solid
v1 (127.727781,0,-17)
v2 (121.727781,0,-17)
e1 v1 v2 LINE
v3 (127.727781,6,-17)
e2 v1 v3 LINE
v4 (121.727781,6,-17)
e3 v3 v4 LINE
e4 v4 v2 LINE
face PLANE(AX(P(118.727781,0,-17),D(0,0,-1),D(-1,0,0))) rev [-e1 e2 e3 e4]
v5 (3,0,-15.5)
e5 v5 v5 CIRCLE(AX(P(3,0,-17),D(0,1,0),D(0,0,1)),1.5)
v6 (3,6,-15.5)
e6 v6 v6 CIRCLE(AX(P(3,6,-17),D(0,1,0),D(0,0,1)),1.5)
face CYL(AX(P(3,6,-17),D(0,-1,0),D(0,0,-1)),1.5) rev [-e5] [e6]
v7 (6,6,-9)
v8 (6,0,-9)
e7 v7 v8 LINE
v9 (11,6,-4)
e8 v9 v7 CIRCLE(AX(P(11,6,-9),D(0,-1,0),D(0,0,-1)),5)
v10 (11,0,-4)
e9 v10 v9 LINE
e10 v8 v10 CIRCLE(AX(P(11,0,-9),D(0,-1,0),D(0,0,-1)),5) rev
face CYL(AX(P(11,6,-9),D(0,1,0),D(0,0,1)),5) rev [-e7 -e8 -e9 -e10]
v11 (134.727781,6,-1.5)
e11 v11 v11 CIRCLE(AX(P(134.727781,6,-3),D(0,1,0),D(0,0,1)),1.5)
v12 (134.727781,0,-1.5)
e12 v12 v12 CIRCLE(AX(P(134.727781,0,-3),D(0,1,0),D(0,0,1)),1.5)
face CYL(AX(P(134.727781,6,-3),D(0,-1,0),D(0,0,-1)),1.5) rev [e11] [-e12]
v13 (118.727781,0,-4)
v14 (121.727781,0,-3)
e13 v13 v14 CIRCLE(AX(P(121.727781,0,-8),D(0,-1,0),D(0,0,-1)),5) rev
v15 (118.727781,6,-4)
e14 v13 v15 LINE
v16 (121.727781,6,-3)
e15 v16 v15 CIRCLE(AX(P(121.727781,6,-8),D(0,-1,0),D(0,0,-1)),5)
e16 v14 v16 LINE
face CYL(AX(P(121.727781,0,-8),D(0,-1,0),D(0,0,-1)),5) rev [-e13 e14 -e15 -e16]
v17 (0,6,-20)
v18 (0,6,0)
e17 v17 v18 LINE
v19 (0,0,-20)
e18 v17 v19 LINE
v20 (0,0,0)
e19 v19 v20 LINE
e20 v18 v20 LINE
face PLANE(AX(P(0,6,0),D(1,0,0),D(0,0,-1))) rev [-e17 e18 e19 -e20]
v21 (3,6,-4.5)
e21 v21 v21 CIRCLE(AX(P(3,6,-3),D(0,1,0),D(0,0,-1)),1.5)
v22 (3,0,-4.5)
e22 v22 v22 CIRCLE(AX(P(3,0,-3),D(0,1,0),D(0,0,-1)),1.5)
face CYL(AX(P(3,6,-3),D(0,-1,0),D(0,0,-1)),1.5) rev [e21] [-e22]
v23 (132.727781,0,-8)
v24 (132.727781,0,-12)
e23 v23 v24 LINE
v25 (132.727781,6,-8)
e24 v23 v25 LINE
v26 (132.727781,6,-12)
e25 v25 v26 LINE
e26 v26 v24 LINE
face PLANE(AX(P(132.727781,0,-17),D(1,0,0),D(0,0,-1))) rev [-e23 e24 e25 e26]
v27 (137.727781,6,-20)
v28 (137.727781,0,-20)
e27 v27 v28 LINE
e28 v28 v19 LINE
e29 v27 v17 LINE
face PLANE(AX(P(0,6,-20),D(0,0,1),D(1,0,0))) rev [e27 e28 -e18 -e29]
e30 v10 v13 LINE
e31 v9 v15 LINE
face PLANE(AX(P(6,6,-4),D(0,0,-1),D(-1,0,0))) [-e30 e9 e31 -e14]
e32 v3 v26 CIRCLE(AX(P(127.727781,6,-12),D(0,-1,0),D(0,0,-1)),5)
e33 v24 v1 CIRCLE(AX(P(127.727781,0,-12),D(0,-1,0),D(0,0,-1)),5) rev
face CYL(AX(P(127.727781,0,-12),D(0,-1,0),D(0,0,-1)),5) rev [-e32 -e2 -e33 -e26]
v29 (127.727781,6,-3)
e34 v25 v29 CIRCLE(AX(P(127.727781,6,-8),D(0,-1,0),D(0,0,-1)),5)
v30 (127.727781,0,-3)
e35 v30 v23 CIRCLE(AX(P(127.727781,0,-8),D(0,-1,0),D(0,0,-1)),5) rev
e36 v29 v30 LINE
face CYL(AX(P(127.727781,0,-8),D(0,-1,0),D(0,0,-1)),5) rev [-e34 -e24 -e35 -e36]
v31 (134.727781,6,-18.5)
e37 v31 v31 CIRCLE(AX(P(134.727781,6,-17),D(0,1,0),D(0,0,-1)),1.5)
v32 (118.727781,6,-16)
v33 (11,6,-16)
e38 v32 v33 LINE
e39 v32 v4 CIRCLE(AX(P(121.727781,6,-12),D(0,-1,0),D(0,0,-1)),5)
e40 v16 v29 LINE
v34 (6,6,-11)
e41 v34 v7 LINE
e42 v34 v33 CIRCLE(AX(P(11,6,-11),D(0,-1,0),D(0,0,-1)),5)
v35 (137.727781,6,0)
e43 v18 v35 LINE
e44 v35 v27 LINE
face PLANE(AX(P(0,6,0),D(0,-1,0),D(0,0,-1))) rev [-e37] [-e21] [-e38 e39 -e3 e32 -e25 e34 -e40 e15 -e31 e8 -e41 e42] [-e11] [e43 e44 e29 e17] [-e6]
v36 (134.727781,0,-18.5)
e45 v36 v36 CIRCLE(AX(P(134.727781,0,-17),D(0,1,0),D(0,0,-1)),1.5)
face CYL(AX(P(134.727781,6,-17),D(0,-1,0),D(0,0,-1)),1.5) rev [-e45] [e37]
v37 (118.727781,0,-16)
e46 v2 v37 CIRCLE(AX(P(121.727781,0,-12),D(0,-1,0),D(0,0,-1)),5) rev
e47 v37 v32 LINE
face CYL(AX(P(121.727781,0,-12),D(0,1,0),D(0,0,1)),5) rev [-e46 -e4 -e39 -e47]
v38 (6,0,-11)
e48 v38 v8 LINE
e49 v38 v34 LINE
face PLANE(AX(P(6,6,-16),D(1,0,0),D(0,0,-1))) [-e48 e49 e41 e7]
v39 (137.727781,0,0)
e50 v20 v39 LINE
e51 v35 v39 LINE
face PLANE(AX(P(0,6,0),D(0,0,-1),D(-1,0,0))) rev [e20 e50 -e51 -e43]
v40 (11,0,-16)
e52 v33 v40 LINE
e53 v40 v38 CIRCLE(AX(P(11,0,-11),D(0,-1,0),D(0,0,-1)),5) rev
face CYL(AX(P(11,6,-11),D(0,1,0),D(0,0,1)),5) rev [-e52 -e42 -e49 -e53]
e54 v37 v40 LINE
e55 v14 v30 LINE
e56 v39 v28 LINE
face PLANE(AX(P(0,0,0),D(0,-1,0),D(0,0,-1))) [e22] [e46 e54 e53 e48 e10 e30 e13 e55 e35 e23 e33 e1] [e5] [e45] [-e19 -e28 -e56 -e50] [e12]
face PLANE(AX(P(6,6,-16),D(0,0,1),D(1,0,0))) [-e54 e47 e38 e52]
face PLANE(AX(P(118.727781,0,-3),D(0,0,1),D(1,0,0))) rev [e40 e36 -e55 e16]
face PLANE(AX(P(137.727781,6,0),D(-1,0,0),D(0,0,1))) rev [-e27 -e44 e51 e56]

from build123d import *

# Parameters (mm, degrees)
SKETCH1_W           = 137.727780531
SKETCH1_H           = 20
SKETCH1_R           = 1.5
SKETCH1_W_2         = 125.727780531
SKETCH1_H_2         = 12
BOSS_EXTRUDE1_DEPTH = 6
CUT_EXTRUDE1_DEPTH  = 140.301620701
FILLET1_R           = 5


with BuildPart() as part:
    # Sketch1 → Boss-Extrude1 (new body)
    with BuildSketch(Plane(origin=(0, 0, 0), x_dir=(1, 0, 0), z_dir=(0, 1, 0))):
        with Locations((68.863890266, 10)):
            Rectangle(SKETCH1_W, SKETCH1_H)
        with Locations(Location((3, 17, 0), (0, 0, 270))):
            Circle(SKETCH1_R, mode=Mode.SUBTRACT)
        with Locations(Location((3, 3, 0), (0, 0, 90))):
            Circle(SKETCH1_R, mode=Mode.SUBTRACT)
        with Locations(Location((134.727780531, 3, 0), (0, 0, 270))):
            Circle(SKETCH1_R, mode=Mode.SUBTRACT)
        with Locations(Location((134.727780531, 17, 0), (0, 0, 90))):
            Circle(SKETCH1_R, mode=Mode.SUBTRACT)
        with Locations((68.863890266, 10)):
            Rectangle(SKETCH1_W_2, SKETCH1_H_2, mode=Mode.SUBTRACT)
    extrude(amount=BOSS_EXTRUDE1_DEPTH)

    # Sketch2 → Cut-Extrude1 (cut, through all)
    with BuildSketch(Plane(origin=(0, 6, 0), x_dir=(1, 0, 0), z_dir=(0, 1, 0))):
        Polygon((118.727780531, 17), (118.727780531, 16), (131.727780531, 16), (131.727780531, 4), (118.727780531, 4), (118.727780531, 3), (132.727780531, 3), (132.727780531, 17), align=None)
    extrude(amount=-CUT_EXTRUDE1_DEPTH, mode=Mode.SUBTRACT)

    # Fillet1
    # the kernel refuses this fillet: 5 mm, written as the material it adds along each edge
    with BuildSketch(Plane(origin=(132.727780531, 6, -17), x_dir=(0, 0, 1), z_dir=(0, -1, 0)), Plane(origin=(132.727780531, 6, -3), x_dir=(-1, 0, 0), z_dir=(0, -1, 0)), Plane(origin=(6, 0, -16), x_dir=(0, 0, 1), z_dir=(0, 1, 0))) as fillet1_piece_1:
        with BuildLine():
            CenterArc((FILLET1_R, FILLET1_R), FILLET1_R, 180, 90)
            Line((0, FILLET1_R), (-FILLET1_R * 0.02, FILLET1_R))
            Line((-FILLET1_R * 0.02, FILLET1_R), (-FILLET1_R * 0.02, -FILLET1_R * 0.02))
            Line((-FILLET1_R * 0.02, -FILLET1_R * 0.02), (FILLET1_R, -FILLET1_R * 0.02))
            Line((FILLET1_R, -FILLET1_R * 0.02), (FILLET1_R, 0))
        make_face()
    extrude(amount=6)
    with BuildSketch(Plane(origin=(118.727780531, 6, -17), x_dir=(1, 0, 0), z_dir=(0, -1, 0))) as fillet1_piece_2:
        with BuildLine():
            CenterArc((3, 5), FILLET1_R, 233.130102354, 36.869897646)
            Line((0, 1), (-0.06, 0.92))
            ThreePointArc((-0.06, 0.92), (-0.1, 0.5), (-0.1, 0))
            Line((-0.1, 0), (0, -0.1))
            Line((0, -0.1), (3, -0.1))
            Line((3, -0.1), (3, 0))
        make_face()
    extrude(amount=6)
    with BuildSketch(Plane(origin=(118.727780531, 6, -3), x_dir=(0, 0, -1), z_dir=(0, -1, 0))) as fillet1_piece_3:
        with BuildLine():
            CenterArc((5, 3), FILLET1_R, 180, 36.869897646)
            Line((0, 3), (-0.1, 3))
            Line((-0.1, 3), (-0.1, 0))
            Line((-0.1, 0), (0, -0.1))
            ThreePointArc((0, -0.1), (0.5, -0.1), (0.92, -0.06))
            Line((0.92, -0.06), (1, 0))
        make_face()
    extrude(amount=6)
    with BuildSketch(Plane(origin=(6, 0, -4), x_dir=(0, 0, -1), z_dir=(0, 1, 0))) as fillet1_piece_4:
        with BuildLine():
            CenterArc((FILLET1_R, -FILLET1_R), FILLET1_R, 90, 90)
            Line((0, -FILLET1_R), (-FILLET1_R * 0.02, -FILLET1_R))
            Line((-FILLET1_R * 0.02, -FILLET1_R), (-FILLET1_R * 0.02, FILLET1_R * 0.02))
            Line((-FILLET1_R * 0.02, FILLET1_R * 0.02), (FILLET1_R, FILLET1_R * 0.02))
            Line((FILLET1_R, FILLET1_R * 0.02), (FILLET1_R, 0))
        make_face()
    extrude(amount=6)


solid = part.part
